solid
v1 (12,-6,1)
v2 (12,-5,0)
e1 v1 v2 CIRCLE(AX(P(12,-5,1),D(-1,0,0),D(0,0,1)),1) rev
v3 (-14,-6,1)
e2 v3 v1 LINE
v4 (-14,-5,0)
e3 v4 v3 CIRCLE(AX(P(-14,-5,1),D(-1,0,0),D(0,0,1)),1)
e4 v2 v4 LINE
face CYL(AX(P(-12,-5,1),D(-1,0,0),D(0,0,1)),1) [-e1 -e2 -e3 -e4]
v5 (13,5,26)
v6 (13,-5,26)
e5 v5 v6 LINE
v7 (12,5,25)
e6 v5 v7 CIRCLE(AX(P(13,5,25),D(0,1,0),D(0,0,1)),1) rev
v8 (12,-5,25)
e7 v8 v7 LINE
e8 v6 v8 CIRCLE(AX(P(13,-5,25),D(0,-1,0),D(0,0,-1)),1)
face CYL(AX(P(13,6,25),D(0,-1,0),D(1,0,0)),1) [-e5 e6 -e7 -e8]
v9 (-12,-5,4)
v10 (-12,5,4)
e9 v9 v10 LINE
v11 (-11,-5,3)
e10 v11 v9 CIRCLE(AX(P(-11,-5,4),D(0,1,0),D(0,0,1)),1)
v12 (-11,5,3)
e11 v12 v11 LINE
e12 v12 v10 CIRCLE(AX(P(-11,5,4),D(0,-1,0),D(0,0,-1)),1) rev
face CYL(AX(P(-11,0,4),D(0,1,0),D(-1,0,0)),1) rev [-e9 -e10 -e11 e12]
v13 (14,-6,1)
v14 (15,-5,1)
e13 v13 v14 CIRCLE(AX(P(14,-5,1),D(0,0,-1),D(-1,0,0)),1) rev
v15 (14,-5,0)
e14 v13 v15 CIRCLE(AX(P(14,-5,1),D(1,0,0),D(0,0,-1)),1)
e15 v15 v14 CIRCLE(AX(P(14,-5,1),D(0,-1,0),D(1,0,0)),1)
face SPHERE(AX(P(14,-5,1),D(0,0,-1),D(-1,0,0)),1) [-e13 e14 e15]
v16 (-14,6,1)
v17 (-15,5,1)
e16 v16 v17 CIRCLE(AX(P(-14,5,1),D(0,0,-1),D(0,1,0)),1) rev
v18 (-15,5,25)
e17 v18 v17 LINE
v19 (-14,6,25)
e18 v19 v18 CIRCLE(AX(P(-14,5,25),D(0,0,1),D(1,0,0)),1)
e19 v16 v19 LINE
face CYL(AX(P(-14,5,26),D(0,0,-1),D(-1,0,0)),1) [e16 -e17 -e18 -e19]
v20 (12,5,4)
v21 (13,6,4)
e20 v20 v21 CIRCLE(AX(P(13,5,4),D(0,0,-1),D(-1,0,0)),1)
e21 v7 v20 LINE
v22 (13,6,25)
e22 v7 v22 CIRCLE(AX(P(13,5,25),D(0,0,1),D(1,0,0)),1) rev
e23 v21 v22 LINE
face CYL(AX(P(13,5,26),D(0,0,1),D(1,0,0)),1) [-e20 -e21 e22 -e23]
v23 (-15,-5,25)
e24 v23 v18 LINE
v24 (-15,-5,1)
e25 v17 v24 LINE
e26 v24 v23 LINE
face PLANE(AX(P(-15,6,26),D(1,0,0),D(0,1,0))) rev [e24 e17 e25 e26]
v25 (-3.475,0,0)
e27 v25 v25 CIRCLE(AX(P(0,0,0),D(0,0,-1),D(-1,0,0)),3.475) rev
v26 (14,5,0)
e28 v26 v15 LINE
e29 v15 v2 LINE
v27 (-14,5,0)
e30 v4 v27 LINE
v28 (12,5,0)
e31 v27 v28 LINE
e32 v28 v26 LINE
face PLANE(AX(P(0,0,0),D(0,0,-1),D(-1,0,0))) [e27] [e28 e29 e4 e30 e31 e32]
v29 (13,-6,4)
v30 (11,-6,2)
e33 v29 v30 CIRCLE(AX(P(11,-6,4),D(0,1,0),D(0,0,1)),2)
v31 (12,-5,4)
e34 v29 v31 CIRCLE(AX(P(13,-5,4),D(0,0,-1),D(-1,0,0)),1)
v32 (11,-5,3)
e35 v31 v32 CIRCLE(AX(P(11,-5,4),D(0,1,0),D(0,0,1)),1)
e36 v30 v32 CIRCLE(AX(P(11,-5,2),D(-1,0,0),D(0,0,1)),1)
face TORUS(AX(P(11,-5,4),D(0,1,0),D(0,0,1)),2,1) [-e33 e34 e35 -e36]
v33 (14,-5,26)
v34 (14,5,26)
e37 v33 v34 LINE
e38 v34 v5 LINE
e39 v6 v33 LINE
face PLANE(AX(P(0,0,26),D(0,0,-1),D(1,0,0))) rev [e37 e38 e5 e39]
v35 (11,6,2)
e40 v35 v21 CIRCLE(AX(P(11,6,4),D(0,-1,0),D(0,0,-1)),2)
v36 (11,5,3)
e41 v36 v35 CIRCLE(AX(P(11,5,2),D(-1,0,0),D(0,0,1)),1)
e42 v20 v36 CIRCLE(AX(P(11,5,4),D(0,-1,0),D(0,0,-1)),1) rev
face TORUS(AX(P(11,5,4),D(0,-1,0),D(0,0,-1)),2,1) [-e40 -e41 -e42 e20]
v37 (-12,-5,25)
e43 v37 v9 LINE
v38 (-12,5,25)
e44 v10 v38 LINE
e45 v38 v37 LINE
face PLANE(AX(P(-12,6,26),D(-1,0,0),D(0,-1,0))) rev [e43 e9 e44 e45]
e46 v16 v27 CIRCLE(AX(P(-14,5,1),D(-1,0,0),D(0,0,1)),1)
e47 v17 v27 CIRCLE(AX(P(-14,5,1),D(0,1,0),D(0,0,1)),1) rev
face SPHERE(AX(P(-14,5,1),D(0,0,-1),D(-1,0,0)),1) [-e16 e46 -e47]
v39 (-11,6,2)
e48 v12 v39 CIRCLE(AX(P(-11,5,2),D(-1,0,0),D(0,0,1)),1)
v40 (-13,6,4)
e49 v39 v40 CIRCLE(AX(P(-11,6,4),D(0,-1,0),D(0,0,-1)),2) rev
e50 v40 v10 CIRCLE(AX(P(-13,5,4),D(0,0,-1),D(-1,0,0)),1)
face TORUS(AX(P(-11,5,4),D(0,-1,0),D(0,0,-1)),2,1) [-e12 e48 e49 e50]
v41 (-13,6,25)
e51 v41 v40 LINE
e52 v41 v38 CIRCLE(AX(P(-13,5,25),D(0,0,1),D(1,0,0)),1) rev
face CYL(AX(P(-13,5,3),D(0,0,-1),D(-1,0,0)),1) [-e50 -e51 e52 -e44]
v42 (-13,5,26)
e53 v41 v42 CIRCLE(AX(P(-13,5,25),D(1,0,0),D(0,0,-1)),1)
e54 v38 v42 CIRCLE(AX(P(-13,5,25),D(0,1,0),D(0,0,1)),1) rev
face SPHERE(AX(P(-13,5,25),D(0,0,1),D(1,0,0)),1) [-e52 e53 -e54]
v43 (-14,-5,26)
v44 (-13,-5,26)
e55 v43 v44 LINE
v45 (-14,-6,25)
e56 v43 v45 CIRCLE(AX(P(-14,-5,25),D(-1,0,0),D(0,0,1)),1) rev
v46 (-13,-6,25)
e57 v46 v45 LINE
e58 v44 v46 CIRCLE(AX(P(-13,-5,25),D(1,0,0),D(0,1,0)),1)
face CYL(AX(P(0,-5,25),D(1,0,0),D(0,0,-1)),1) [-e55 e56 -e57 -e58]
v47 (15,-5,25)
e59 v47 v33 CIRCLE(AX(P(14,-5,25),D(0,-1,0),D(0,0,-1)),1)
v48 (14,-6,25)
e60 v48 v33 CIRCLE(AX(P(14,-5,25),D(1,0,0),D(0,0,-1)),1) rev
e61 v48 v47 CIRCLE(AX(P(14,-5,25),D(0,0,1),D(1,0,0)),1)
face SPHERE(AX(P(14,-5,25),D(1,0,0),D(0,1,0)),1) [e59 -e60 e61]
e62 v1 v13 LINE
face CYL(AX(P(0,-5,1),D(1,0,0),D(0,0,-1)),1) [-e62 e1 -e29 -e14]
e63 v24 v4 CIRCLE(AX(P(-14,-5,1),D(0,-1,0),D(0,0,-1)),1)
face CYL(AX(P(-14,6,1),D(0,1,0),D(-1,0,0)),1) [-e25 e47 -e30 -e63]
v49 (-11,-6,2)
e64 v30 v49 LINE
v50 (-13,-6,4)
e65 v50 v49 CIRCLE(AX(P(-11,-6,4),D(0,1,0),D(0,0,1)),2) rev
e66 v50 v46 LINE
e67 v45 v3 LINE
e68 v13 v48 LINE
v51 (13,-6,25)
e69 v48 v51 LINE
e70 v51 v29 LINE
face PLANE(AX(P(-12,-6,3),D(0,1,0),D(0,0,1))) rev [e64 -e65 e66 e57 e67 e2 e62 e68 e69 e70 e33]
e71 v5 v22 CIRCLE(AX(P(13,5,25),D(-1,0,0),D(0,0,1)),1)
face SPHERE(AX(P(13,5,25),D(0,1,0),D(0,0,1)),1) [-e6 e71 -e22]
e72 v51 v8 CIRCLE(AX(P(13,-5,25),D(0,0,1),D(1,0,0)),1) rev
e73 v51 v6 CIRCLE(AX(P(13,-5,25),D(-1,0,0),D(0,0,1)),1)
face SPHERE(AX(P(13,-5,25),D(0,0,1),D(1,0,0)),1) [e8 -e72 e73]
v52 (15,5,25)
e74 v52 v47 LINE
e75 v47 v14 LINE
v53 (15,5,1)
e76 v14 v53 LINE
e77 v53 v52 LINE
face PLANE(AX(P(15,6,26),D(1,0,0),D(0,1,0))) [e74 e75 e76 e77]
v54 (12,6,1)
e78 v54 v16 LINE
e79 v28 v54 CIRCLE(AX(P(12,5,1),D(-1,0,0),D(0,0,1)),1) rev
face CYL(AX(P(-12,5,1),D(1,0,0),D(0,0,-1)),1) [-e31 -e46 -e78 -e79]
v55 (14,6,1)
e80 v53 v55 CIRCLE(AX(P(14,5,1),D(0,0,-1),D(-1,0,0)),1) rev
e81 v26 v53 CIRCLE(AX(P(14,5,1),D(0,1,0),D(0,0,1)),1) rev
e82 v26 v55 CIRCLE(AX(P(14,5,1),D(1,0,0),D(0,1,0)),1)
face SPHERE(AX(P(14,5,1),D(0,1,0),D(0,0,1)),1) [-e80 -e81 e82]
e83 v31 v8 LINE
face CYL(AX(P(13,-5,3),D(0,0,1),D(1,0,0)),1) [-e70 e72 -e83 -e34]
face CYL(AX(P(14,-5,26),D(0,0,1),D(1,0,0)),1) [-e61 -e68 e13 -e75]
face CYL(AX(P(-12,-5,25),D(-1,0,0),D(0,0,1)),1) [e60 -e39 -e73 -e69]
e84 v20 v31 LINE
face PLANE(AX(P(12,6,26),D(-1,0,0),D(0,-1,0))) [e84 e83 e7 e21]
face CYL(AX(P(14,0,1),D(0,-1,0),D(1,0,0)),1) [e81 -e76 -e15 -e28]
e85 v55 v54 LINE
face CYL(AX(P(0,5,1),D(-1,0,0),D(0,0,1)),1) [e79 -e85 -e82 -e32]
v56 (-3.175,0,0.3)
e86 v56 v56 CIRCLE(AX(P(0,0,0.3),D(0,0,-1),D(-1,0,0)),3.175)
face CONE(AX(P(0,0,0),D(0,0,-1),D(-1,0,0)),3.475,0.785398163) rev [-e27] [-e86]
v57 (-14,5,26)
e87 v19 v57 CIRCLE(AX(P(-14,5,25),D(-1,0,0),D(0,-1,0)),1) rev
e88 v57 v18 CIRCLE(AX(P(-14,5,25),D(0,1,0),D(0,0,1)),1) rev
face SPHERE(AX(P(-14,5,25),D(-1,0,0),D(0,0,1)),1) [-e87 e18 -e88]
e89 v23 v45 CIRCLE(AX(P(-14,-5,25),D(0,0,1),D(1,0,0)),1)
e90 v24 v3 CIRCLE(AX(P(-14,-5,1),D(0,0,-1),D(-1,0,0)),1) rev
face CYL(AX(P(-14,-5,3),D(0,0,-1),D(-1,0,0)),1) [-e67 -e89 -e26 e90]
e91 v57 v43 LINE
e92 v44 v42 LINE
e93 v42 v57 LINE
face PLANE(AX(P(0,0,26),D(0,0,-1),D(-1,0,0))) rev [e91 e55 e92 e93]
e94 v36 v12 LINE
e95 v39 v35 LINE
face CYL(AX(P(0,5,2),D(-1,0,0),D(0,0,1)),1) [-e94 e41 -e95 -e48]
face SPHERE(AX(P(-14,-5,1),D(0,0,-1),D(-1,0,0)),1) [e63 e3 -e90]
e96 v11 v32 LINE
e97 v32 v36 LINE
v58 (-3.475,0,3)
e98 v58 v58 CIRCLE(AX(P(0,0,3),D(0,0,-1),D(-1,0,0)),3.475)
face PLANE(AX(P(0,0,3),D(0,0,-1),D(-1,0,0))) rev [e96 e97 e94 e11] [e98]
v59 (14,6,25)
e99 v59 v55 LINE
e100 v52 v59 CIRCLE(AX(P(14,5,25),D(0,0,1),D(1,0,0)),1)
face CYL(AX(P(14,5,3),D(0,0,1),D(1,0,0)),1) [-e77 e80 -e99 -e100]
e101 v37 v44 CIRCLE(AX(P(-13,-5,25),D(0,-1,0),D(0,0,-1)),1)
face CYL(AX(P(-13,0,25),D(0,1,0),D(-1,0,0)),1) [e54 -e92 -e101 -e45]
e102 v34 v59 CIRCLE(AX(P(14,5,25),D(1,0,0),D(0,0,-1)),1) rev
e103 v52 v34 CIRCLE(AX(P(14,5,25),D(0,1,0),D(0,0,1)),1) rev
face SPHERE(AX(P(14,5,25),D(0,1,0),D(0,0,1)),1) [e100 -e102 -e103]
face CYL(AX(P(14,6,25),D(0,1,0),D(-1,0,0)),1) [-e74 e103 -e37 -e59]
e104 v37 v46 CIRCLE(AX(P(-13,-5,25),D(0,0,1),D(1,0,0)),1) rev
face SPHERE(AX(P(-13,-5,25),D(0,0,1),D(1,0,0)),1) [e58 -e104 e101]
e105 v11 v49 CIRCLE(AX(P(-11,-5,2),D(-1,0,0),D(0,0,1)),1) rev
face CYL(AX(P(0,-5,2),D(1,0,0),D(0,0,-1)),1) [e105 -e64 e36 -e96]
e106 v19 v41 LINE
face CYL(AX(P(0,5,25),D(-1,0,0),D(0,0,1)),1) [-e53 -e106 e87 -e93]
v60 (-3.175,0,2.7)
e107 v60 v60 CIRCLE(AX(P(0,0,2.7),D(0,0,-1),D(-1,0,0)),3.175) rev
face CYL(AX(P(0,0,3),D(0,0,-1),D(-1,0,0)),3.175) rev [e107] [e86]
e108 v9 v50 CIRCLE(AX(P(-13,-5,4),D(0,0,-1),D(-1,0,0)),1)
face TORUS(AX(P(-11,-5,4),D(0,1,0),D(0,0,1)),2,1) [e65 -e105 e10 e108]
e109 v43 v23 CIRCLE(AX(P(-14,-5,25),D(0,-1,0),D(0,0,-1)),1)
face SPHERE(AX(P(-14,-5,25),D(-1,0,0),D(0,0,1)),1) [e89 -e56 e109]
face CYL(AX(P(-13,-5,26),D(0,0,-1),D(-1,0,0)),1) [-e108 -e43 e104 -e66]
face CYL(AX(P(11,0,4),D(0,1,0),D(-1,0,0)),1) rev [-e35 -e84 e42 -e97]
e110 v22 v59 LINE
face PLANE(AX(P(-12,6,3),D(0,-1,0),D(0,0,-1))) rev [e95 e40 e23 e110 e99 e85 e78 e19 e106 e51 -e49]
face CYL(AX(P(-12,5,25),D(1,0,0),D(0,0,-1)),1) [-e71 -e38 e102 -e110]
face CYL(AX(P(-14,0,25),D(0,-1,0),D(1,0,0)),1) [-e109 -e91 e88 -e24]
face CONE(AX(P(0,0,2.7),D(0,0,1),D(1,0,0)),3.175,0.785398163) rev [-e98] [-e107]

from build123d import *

# Parameters (mm, degrees)
SKETCH1_W           = 24
SKETCH1_H           = 12
SKETCH1_R           = 3.175
BOSS_EXTRUDE1_DEPTH = 3
SKETCH3_W           = 3
SKETCH3_H           = 12
BOSS_EXTRUDE2_DEPTH = 26
FILLET1_R           = 1
CHAMFER1_SIZE       = 0.3


# Read off the part's stored shape, not the designer's step: Mirror1
with BuildPart() as part:
    # Sketch1 → Boss-Extrude1 (new body)
    with BuildSketch(Plane.XY):
        Rectangle(SKETCH1_W, SKETCH1_H)
        Circle(SKETCH1_R, mode=Mode.SUBTRACT)
    extrude(amount=BOSS_EXTRUDE1_DEPTH)

    # Sketch3 → Boss-Extrude2 (add)
    with BuildSketch(Plane.XY):
        with Locations((-13.5, 0)):
            Rectangle(SKETCH3_W, SKETCH3_H)
    extrude(amount=BOSS_EXTRUDE2_DEPTH)

    # Fillet1
    fillet1_edges = [part.edges().sort_by_distance(p)[0] for p in [
        (-12, 0, 3),
        (0, -6, 3),
        (-15, 0, 0),
        (-15, 6, 13),
        (-15, -6, 13),
        (-12, -6, 14.5),
        (-12, 6, 14.5),
        (-15, 0, 26),
        (-13.5, -6, 26),
        (-12, 0, 26),
        (-13.5, 6, 26),
        (-1.5, -6, 0),
        (-1.5, 6, 0),
        (0, 6, 3),
    ]]
    fillet(fillet1_edges, radius=FILLET1_R)

    # Mirror1: part across plane


with BuildPart() as part_1:
    add(part.part)
    add(part.part.mirror(Plane(origin=(0, 0, 0), x_dir=(0, 0, 1), z_dir=(1, 0, 0))))

    # Chamfer1
    chamfer1_edges = [part_1.edges().sort_by_distance(p)[0] for p in [
        (-3.175, 0, 0),
        (-3.175, 0, 3),
    ]]
    chamfer(chamfer1_edges, length=CHAMFER1_SIZE)


solid = part_1.part
